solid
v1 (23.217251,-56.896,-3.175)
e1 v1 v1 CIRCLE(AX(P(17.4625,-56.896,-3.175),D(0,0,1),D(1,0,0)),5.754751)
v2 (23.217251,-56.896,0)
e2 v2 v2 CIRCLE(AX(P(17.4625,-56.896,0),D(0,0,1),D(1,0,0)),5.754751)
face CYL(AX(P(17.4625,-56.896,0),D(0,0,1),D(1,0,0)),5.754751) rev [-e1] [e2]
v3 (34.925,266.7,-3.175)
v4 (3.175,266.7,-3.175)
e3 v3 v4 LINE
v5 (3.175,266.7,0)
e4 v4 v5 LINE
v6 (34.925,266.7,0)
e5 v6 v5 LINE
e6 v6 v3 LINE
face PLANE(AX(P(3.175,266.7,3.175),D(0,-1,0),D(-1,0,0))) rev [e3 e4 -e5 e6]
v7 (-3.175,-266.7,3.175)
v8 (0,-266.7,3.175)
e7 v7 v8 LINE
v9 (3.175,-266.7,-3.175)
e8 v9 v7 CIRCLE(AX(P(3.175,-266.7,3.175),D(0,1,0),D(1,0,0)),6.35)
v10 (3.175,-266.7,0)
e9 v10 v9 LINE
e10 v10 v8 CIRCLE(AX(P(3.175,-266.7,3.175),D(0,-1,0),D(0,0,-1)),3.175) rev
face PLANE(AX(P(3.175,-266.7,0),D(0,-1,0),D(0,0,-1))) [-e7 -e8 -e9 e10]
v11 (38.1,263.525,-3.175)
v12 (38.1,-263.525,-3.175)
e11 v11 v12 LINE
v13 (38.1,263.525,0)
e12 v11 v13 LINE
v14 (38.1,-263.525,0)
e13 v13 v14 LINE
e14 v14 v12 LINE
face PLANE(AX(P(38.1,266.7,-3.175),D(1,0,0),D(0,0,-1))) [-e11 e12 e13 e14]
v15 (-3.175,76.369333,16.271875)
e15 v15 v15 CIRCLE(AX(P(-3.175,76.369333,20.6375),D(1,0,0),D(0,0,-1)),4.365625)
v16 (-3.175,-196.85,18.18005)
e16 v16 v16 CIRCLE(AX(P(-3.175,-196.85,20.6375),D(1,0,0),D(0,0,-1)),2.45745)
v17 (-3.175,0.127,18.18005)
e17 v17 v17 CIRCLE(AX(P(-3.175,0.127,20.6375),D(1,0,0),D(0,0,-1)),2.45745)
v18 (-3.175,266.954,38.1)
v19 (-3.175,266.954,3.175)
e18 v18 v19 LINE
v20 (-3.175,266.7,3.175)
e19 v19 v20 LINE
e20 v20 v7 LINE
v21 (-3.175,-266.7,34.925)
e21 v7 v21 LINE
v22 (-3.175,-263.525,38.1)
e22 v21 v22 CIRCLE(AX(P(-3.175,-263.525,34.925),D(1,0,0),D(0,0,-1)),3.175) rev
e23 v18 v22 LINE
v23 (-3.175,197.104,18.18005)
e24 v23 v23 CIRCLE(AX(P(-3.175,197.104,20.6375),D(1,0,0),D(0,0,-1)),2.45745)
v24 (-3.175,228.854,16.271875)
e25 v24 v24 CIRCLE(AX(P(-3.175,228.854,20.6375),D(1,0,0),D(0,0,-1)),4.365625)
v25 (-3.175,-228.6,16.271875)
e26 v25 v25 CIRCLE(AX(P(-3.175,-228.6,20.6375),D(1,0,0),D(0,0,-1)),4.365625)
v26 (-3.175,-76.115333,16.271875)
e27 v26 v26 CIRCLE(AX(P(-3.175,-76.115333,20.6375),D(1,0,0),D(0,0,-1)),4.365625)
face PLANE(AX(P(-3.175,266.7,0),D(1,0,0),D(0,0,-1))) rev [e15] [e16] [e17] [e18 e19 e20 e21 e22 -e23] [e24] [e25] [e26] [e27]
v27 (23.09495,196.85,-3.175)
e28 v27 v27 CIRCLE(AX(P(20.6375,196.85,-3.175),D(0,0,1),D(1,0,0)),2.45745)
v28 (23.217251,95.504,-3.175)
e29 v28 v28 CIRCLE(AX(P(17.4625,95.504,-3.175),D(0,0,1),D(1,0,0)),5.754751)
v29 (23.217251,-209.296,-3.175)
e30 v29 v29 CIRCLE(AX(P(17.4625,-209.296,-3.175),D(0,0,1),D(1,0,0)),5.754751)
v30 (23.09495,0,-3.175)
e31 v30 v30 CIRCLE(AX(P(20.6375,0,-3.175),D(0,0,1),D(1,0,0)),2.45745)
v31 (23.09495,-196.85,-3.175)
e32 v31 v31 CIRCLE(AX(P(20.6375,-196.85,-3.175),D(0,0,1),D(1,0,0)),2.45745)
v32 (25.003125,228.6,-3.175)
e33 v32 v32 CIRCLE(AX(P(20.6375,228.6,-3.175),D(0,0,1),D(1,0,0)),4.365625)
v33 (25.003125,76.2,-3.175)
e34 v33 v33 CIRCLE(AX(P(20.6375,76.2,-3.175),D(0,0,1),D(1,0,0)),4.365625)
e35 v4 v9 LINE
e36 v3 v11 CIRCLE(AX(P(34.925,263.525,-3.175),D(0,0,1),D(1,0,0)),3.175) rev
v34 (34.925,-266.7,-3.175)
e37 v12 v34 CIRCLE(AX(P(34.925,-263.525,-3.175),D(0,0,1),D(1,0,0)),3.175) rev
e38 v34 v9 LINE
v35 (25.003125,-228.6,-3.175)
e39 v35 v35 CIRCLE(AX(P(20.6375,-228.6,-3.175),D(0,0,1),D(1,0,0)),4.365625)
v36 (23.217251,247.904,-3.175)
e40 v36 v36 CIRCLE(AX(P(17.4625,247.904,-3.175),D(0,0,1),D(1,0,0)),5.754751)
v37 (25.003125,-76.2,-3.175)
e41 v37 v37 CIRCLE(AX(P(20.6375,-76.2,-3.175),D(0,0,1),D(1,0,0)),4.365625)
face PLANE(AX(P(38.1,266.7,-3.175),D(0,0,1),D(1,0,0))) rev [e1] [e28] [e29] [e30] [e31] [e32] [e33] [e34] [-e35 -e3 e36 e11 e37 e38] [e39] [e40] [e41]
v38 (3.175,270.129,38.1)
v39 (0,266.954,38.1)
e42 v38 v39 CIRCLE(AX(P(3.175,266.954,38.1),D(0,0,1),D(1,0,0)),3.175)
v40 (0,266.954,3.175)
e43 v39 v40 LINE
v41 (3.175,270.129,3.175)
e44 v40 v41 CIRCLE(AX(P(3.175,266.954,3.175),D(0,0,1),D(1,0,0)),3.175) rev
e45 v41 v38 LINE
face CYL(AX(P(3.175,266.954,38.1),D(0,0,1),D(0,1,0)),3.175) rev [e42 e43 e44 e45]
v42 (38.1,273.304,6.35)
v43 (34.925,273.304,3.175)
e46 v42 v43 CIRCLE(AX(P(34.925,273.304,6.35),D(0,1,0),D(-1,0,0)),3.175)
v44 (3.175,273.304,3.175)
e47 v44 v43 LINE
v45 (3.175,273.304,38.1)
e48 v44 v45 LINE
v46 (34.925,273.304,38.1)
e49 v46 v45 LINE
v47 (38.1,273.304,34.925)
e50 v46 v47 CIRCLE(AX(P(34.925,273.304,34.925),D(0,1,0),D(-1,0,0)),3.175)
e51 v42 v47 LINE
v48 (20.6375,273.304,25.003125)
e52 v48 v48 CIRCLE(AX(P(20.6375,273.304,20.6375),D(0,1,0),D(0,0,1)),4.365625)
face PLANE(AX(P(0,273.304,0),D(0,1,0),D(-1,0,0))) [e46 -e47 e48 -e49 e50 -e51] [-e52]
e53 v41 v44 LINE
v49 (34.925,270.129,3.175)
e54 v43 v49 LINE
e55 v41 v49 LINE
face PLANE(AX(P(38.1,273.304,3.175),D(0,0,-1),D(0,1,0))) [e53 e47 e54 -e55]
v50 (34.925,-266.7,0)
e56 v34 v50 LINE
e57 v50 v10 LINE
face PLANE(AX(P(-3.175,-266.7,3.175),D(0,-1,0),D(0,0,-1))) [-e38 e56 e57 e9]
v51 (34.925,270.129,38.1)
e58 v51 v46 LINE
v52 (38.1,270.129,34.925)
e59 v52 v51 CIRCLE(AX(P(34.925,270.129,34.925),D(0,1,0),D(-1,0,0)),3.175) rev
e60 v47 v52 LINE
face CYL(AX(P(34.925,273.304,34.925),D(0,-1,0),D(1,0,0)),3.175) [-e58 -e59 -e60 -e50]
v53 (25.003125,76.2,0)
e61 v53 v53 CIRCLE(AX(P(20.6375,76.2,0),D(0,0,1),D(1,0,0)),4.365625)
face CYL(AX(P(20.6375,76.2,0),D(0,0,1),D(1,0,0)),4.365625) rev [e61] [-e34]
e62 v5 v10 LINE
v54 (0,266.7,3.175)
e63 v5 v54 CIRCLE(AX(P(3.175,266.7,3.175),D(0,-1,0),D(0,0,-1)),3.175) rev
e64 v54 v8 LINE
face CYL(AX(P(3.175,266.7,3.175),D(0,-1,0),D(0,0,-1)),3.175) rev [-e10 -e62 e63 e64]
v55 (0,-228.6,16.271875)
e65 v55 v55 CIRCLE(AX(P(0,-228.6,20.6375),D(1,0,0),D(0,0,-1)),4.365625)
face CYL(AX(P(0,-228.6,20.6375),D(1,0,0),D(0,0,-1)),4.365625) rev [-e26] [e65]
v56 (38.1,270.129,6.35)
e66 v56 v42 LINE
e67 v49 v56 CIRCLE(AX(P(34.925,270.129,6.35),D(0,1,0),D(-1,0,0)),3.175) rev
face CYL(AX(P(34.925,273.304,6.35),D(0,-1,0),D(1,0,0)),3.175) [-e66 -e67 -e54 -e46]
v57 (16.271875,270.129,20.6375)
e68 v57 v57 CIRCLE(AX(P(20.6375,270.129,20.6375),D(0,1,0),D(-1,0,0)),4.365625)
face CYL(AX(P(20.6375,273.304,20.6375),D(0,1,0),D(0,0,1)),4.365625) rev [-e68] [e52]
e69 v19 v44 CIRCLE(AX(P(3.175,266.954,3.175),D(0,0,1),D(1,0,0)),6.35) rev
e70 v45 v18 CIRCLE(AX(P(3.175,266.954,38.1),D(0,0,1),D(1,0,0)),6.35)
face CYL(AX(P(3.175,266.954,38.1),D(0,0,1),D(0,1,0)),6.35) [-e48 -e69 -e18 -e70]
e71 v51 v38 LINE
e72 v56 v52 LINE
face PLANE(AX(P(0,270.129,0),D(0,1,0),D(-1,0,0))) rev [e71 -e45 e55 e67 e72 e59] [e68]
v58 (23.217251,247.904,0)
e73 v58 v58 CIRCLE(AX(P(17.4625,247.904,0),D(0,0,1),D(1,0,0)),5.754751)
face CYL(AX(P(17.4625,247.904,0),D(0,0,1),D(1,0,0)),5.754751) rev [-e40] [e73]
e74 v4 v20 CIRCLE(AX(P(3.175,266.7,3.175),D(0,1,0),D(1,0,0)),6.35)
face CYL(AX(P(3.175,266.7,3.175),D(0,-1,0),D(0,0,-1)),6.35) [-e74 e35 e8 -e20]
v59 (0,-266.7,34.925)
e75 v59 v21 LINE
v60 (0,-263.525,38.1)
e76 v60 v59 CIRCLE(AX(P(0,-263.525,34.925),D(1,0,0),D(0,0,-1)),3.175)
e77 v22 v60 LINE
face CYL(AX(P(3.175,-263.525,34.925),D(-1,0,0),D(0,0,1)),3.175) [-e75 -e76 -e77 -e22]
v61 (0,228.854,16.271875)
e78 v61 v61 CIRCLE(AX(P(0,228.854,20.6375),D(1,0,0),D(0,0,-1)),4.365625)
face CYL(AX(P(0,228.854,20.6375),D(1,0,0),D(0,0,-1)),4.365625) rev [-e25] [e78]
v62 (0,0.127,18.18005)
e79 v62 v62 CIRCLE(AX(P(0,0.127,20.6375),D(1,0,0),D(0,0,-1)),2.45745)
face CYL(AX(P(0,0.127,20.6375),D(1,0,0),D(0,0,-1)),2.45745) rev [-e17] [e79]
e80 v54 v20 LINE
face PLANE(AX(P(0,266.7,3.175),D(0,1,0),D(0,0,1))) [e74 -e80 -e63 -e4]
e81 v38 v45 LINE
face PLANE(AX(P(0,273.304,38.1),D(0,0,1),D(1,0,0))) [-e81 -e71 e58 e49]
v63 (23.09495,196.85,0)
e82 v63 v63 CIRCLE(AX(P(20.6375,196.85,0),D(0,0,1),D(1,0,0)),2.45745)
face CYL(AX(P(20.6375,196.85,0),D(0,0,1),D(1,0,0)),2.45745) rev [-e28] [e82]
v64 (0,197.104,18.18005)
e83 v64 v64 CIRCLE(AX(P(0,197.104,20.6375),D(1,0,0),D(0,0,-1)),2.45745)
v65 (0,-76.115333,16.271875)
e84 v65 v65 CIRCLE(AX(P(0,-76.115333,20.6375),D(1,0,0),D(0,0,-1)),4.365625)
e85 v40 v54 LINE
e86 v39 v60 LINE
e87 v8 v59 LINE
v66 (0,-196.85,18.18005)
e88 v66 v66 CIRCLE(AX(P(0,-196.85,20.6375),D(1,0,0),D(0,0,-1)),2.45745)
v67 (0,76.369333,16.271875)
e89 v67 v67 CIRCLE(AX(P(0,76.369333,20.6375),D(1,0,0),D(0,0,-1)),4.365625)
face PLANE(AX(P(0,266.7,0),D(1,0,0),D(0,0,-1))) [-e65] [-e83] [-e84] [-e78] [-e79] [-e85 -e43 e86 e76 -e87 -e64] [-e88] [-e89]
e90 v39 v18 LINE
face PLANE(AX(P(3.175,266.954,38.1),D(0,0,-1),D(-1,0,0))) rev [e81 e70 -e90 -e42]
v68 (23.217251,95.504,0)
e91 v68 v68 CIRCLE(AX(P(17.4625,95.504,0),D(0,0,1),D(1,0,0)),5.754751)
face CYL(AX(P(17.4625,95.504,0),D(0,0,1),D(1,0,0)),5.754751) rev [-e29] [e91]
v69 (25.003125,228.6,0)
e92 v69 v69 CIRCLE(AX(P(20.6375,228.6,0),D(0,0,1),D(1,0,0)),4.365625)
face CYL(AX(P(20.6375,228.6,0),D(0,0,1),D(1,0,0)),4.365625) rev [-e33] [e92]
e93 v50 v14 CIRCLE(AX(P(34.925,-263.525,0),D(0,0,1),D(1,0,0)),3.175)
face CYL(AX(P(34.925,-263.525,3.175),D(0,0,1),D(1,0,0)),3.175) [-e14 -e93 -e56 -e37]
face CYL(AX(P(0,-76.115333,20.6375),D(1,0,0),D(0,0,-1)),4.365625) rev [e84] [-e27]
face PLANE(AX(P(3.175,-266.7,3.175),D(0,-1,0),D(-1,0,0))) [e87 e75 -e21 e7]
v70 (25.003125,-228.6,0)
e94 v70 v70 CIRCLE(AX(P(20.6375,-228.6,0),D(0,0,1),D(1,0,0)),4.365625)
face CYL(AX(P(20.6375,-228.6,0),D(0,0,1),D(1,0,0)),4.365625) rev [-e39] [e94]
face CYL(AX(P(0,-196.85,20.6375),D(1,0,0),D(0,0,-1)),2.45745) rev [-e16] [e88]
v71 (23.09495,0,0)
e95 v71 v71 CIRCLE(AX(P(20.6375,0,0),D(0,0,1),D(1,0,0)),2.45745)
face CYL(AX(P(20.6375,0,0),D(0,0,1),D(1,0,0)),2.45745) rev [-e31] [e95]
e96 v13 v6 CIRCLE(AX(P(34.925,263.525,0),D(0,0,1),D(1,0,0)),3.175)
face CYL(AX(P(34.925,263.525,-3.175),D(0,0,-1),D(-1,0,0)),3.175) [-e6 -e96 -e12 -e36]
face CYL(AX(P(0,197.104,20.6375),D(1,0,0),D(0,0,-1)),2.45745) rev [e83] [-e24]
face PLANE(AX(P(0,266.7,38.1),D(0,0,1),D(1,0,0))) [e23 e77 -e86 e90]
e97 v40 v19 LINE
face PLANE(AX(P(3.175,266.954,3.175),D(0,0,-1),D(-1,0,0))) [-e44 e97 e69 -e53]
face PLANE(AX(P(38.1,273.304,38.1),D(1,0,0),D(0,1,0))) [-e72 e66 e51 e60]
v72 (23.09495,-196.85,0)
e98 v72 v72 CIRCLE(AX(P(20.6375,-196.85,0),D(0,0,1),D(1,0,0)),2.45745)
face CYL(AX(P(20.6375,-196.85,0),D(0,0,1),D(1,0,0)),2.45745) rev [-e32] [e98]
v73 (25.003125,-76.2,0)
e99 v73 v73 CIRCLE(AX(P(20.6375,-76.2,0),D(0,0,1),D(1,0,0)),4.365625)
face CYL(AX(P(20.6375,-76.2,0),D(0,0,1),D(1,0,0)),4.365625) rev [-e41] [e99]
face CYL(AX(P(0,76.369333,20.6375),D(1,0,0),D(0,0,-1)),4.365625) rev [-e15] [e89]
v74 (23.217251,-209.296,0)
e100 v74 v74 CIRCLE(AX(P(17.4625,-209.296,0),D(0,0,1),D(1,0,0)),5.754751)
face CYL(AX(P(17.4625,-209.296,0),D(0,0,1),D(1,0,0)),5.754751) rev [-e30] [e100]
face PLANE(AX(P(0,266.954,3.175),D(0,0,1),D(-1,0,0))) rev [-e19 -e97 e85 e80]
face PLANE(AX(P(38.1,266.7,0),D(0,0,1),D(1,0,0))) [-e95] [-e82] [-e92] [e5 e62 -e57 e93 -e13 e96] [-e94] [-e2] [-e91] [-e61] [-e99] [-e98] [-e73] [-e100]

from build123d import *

# Parameters (mm, degrees)
BASE_FLANGE1_DEPTH               = 266.7
F_10_0_1935_DIAMETER_HOLE1_D     = 4.9149
F_29_64_0_45313_DIAMETER_HOLE1_D = 11.509502
F_11_32_0_34375_DIAMETER_HOLE1_D = 8.73125
EDGE_FLANGE1_DEPTH               = 34.925
F_11_32_0_34375_DIAMETER_HOLE2_D = 8.73125
F_11_32_0_34375_DIAMETER_HOLE6_D = 8.73125
FILLET1_R                        = 3.175
F_10_0_1935_DIAMETER_HOLE2_D     = 4.9149


# Sheet-metal steps are written as plain solids
with BuildPart() as part:
    # Sketch1 → Base-Flange1 (new, symmetric)
    with BuildSketch(Plane(origin=(0, 0, 0), x_dir=(1, 0, 0), z_dir=(0, 1, 0))):
        with BuildLine():
            Line((38.1, 0), (3.175, 0))
            ThreePointArc((3.175, 0), (0.92993597, -0.92993597), (0, -3.175))
            Line((0, -3.175), (0, -38.1))
            Line((0, -38.1), (-3.175, -38.1))
            Line((-3.175, -38.1), (-3.175, -3.175))
            ThreePointArc((-3.175, -3.175), (-1.315128061, 1.315128061), (3.175, 3.175))
            Line((3.175, 3.175), (38.1, 3.175))
            Line((38.1, 3.175), (38.1, 0))
        make_face()
    extrude(amount=BASE_FLANGE1_DEPTH, both=True)

    # #10 (0.1935) Diameter Hole1 (through all)
    with Locations(Plane.XY):
        with Locations((20.6375, -196.85), (20.6375, 0), (20.6375, 196.85)):
            Hole(F_10_0_1935_DIAMETER_HOLE1_D / 2)

    # 29/64 (0.45313) Diameter Hole1 (through all)
    with Locations(Plane.XY):
        with Locations((17.4625, 247.904), (17.4625, 95.504), (17.4625, -56.896), (17.4625, -209.296)):
            Hole(F_29_64_0_45313_DIAMETER_HOLE1_D / 2)

    # 11/32 (0.34375) Diameter Hole1 (through all)
    with Locations(Plane.XY):
        with Locations((20.6375, 228.6), (20.6375, 76.2), (20.6375, -76.2), (20.6375, -228.6)):
            Hole(F_11_32_0_34375_DIAMETER_HOLE1_D / 2)

    # Edge-Flange1 section (across the edge) → Edge-Flange1 (add)
    with BuildSketch(Plane(origin=(0, 273.304, 3.175), x_dir=(0, -1, 0), z_dir=(0, 0, 1))):
        with BuildLine():
            Line((0, 3.175), (0, 38.1))
            Line((0, 38.1), (3.175, 38.1))
            Line((3.175, 38.1), (3.175, 3.175))
            ThreePointArc((3.175, 3.175), (4.10493597, 0.92993597), (6.35, 0))
            Line((6.35, 0), (6.604, 0))
            Line((6.604, 0), (6.604, -3.175))
            Line((6.604, -3.175), (6.35, -3.175))
            ThreePointArc((6.35, -3.175), (1.859871939, -1.315128061), (0, 3.175))
        make_face()
    extrude(amount=EDGE_FLANGE1_DEPTH)

    # 11/32 (0.34375) Diameter Hole2 (through all)
    with Locations(Plane(origin=(0, 0, 0), x_dir=(0, 0, -1), z_dir=(1, 0, 0))):
        with Locations((-20.6375, 228.854), (-20.6375, 76.369333333), (-20.6375, -76.115333333), (-20.6375, -228.6)):
            Hole(F_11_32_0_34375_DIAMETER_HOLE2_D / 2)

    # 11/32 (0.34375) Diameter Hole6 (through all)
    with Locations(Plane(origin=(0, 273.304, 0), x_dir=(1, 0, 0), z_dir=(0, 1, 0))):
        with Locations((20.6375, -20.6375)):
            Hole(F_11_32_0_34375_DIAMETER_HOLE6_D / 2)

    # Fillet1
    fillet1_edges = [part.edges().sort_by_distance(p)[0] for p in [
        (38.1, 271.7165, 3.175),
        (38.1, 271.7165, 38.1),
        (38.1, 266.7, -1.5875),
        (38.1, -266.7, -1.5875),
        (-1.5875, -266.7, 38.1),
    ]]
    fillet(fillet1_edges, radius=FILLET1_R)

    # #10 (0.1935) Diameter Hole2 (through all)
    with Locations(Plane(origin=(0, 0, 0), x_dir=(0, 0, -1), z_dir=(1, 0, 0))):
        with Locations((-20.6375, 197.104), (-20.6375, -196.85), (-20.6375, 0.127)):
            Hole(F_10_0_1935_DIAMETER_HOLE2_D / 2)


solid = part.part
